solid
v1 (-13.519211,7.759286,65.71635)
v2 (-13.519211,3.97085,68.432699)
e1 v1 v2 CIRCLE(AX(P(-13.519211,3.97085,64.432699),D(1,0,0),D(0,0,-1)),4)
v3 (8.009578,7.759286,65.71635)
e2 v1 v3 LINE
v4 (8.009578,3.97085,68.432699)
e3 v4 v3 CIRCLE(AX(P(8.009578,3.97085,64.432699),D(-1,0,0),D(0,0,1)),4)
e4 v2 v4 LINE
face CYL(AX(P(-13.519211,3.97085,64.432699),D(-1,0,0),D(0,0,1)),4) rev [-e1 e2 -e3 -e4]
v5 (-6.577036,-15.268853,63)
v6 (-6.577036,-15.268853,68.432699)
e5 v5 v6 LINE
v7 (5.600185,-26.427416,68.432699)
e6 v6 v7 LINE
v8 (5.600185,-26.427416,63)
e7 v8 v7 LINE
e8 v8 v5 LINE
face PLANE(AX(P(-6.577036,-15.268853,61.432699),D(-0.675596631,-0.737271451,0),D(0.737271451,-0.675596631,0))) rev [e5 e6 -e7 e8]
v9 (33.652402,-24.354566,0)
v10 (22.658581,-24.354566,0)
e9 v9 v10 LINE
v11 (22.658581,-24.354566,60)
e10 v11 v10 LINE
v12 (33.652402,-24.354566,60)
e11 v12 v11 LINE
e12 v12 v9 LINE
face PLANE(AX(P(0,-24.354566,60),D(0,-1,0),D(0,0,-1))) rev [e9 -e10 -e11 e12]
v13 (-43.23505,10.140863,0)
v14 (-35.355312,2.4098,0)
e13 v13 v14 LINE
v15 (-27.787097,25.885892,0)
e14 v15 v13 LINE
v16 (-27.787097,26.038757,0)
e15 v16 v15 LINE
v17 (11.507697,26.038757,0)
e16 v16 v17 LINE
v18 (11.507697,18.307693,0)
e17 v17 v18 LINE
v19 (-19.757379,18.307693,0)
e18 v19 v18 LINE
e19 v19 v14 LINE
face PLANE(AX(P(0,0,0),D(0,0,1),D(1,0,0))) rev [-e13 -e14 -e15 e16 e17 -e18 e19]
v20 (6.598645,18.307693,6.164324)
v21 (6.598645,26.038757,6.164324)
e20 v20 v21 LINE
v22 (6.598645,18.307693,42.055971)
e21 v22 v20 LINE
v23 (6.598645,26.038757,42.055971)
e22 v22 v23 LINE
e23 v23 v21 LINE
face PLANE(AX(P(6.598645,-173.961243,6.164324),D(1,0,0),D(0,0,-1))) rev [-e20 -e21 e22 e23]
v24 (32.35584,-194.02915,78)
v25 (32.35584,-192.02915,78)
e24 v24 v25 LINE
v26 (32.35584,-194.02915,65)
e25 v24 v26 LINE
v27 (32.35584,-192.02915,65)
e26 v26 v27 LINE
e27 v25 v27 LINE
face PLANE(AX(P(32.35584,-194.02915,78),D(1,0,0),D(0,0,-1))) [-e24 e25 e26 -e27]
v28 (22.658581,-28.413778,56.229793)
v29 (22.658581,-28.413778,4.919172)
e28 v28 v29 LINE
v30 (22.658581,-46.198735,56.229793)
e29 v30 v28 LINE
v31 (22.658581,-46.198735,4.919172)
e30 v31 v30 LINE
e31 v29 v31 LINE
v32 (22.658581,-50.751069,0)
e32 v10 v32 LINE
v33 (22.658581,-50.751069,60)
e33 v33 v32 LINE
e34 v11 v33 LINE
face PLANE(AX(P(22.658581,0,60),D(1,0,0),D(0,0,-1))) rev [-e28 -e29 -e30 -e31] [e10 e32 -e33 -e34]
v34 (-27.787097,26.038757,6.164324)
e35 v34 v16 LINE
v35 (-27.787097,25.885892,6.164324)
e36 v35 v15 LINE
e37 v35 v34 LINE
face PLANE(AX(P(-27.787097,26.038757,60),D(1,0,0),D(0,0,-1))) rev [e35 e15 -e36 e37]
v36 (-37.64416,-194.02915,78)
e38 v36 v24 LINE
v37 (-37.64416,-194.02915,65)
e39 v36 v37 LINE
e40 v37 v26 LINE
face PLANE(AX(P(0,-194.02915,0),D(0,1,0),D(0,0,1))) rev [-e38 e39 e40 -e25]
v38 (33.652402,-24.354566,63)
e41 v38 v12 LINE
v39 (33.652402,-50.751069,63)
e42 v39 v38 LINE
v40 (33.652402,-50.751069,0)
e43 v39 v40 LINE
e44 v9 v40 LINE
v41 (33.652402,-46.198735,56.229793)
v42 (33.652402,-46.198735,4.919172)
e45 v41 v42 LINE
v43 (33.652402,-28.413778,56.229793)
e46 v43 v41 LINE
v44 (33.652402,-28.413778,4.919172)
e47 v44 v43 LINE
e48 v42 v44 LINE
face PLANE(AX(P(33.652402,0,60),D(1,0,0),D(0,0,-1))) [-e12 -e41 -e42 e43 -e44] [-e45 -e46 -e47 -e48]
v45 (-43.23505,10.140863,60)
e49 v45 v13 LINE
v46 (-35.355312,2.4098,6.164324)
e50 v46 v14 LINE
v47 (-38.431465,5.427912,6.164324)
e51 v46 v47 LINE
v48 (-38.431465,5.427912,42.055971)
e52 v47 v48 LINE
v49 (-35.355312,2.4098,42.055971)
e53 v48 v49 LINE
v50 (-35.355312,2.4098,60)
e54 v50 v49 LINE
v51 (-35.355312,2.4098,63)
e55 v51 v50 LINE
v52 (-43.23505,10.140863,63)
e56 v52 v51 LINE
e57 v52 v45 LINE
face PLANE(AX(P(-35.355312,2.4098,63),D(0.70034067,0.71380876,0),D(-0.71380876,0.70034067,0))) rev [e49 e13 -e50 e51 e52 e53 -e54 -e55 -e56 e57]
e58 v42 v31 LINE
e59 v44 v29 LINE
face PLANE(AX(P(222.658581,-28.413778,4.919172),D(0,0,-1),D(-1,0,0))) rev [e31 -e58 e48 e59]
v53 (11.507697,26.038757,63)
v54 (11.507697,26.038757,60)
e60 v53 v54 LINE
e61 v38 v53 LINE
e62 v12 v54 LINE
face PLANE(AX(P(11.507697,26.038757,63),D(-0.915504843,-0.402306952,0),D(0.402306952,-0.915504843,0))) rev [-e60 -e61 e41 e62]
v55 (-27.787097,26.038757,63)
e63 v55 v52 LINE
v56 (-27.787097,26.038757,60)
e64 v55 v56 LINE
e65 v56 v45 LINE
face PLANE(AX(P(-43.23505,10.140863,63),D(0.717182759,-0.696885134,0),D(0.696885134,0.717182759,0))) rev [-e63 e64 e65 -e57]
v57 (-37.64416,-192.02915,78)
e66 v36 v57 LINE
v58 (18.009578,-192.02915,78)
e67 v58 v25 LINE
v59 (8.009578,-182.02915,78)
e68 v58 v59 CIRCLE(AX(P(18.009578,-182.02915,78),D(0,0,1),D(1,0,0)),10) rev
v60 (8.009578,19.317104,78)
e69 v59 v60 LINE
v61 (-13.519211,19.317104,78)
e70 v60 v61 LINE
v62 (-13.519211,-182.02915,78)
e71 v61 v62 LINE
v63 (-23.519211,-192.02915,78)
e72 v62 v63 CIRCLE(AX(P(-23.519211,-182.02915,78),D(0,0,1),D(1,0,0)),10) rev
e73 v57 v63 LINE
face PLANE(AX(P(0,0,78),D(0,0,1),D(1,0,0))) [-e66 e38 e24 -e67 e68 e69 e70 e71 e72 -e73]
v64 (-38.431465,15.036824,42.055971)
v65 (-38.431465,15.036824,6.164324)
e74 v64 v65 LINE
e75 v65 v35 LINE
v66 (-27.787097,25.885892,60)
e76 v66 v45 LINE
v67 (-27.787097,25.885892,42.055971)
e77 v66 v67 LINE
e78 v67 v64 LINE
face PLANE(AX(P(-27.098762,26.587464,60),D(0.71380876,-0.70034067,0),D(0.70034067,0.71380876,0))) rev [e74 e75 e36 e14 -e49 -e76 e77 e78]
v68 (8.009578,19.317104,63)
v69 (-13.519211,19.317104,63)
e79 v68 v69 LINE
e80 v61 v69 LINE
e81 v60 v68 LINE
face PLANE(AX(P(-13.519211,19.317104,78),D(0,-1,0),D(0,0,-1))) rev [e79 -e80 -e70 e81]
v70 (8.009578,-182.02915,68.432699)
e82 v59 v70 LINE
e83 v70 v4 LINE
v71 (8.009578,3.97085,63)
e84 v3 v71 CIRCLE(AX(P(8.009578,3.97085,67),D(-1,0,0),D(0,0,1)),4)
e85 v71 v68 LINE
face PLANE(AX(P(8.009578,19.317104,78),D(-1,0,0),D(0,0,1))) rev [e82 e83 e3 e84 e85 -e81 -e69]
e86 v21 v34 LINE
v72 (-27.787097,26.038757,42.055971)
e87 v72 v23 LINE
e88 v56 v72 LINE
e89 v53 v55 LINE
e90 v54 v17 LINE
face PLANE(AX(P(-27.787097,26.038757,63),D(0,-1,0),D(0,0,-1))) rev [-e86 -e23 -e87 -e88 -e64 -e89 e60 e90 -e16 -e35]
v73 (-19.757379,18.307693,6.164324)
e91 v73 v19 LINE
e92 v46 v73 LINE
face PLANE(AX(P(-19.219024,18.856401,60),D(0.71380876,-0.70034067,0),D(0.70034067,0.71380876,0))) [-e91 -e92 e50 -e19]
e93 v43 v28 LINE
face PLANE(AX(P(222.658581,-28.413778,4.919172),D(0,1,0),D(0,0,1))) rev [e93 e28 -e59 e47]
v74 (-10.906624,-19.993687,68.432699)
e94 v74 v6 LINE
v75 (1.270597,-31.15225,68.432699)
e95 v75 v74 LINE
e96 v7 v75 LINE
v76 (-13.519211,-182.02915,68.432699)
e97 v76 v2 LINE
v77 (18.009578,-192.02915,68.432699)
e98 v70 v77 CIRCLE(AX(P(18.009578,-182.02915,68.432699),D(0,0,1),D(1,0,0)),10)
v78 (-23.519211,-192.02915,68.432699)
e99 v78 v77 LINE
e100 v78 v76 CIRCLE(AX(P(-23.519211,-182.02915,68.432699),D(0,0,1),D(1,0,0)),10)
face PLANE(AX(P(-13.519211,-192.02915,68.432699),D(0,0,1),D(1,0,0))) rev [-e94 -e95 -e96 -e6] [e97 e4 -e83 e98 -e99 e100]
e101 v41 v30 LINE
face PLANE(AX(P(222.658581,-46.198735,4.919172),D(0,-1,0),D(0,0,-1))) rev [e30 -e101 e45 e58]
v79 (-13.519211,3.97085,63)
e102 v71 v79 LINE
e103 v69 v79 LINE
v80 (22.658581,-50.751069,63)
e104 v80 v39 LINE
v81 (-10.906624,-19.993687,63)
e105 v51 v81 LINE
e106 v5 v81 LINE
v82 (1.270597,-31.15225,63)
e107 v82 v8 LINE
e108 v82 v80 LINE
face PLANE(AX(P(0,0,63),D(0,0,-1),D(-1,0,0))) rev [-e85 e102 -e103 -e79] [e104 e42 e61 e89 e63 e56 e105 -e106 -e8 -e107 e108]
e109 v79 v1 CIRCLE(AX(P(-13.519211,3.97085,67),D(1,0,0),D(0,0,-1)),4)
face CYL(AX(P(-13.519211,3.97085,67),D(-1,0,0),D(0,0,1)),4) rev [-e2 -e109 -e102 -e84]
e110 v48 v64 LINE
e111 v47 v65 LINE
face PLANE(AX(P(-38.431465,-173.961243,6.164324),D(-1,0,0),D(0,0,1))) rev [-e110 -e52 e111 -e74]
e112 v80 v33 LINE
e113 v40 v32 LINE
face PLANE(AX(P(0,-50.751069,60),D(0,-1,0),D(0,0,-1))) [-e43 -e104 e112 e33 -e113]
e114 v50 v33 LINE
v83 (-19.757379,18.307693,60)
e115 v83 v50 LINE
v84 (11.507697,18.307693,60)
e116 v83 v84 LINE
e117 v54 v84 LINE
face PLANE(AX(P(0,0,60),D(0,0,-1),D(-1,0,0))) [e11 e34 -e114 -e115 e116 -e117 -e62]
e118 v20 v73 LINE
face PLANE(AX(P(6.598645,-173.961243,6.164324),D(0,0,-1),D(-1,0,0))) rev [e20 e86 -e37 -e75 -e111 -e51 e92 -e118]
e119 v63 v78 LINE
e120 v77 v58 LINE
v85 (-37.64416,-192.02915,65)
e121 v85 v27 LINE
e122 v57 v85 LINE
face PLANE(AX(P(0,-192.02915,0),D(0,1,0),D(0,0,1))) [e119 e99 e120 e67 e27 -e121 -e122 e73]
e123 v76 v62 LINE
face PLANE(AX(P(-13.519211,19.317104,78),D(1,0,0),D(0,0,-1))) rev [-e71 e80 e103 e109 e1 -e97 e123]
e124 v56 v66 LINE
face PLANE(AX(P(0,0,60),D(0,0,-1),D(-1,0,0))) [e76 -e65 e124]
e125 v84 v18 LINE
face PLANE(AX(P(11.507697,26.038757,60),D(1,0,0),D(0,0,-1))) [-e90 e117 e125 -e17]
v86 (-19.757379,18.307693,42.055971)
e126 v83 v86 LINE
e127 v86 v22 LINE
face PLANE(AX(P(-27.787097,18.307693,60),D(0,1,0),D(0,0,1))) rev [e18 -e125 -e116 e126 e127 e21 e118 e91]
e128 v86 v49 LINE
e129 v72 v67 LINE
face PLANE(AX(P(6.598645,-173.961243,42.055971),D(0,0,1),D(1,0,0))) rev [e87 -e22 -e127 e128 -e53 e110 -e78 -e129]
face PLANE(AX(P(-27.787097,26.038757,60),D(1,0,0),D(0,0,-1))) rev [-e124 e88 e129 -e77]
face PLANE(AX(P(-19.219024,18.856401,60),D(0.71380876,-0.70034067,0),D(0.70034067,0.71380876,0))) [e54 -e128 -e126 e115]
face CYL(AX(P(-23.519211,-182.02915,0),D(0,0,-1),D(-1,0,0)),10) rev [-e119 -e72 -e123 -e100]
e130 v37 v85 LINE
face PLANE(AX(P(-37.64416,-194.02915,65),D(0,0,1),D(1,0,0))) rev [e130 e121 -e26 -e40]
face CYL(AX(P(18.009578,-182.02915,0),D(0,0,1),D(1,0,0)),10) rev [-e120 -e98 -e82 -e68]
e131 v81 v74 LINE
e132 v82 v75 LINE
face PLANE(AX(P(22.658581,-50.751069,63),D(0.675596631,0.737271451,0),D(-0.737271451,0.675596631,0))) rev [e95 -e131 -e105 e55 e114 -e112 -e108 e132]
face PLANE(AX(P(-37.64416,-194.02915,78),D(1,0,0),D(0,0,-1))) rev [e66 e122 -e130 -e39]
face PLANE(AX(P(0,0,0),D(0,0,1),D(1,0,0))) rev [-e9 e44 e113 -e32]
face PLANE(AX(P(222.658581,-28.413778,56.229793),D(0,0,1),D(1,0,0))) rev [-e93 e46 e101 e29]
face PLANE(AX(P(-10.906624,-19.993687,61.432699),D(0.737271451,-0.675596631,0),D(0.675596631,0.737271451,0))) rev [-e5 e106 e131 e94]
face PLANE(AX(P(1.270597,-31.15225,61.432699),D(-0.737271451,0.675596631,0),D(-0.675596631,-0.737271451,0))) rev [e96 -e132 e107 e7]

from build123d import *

# Parameters (mm, degrees)
BOSS_EXTRUDE1_DEPTH   = 60
SKETCH1_W             = 10.993820537
SKETCH1_H             = 26.396502677
BOSS_EXTRUDE1_2_DEPTH = 60
BOSS_EXTRUDE2_DEPTH   = 3
SKETCH3_W             = 21.528788888
SKETCH3_H             = 11.346253603
BOSS_EXTRUDE3_DEPTH   = 15
SKETCH4_W             = 21.528788888
SKETCH4_H             = 9.567300702
BOSS_EXTRUDE4_DEPTH   = 200
SKETCH5_W             = 51.310621716
SKETCH5_H             = 17.784956531
CUT_EXTRUDE1_DEPTH    = 200
SKETCH6_W             = 45.030110597
SKETCH6_H             = 35.891646976
CUT_EXTRUDE2_DEPTH    = 200
SKETCH7_W             = 70
SKETCH7_H             = 13
BOSS_EXTRUDE5_DEPTH   = 2
FILLET1_R             = 10
FILLET3_R             = 4
BOSS_EXTRUDE6_DEPTH   = 7


with BuildPart() as part:
    # Sketch1 → Boss-Extrude1 (new body)
    with BuildSketch(Plane.XY):
        Polygon((-19.757378597, 18.307693349), (11.507697245, 18.307693349), (11.507697245, 26.038756838), (-27.787096512, 26.038756838), (-27.787096512, 25.885892475), (-43.235049783, 10.14086318), (-35.355311996, 2.409799691), align=None)
    extrude(amount=BOSS_EXTRUDE1_DEPTH)



with BuildPart() as body_2:
    # Sketch1 → Boss-Extrude1 2 (new body)
    with BuildSketch(Plane.XY):
        with Locations((28.155491547, -37.552817793)):
            Rectangle(SKETCH1_W, SKETCH1_H)
    extrude(amount=BOSS_EXTRUDE1_2_DEPTH)


with BuildPart() as part_1:
    add(part.part)

    add(body_2.part)  # Boss-Extrude2 merges body 2
    # Sketch2 → Boss-Extrude2 (add)
    with BuildSketch(Plane.XY.offset(60)):
        Polygon((-43.235049783, 10.14086318), (-27.787096512, 26.038756838), (11.507697245, 26.038756838), (33.652401815, -24.354566454), (33.652401815, -50.751069131), (22.658581278, -50.751069131), (-35.355311996, 2.409799691), align=None)
    extrude(amount=BOSS_EXTRUDE2_DEPTH)

    # Sketch3 → Boss-Extrude3 (add)
    with BuildSketch(Plane.XY.offset(63)):
        with Locations((-2.754816927, 13.64397724)):
            Rectangle(SKETCH3_W, SKETCH3_H)
    extrude(amount=BOSS_EXTRUDE3_DEPTH)

    # Sketch4 → Boss-Extrude4 (add)
    with BuildSketch(Plane.XZ.offset(-7.970850439)):
        with Locations((-2.754816927, 73.216349649)):
            Rectangle(SKETCH4_W, SKETCH4_H)
    extrude(amount=BOSS_EXTRUDE4_DEPTH)

    # Sketch5 → Cut-Extrude1 (cut)
    with BuildSketch(Plane.ZY.offset(-22.658581278)):
        with Locations((30.574482512, -37.306256307)):
            Rectangle(SKETCH5_W, SKETCH5_H)
    extrude(amount=-CUT_EXTRUDE1_DEPTH, mode=Mode.SUBTRACT)

    # Sketch6 → Cut-Extrude2 (cut)
    with BuildSketch(Plane(origin=(0, 26.038756838, 0), x_dir=(1, 0, 0), z_dir=(0, 1, 0))):
        with Locations((-15.916410132, -24.110147888)):
            Rectangle(SKETCH6_W, SKETCH6_H)
    extrude(amount=-CUT_EXTRUDE2_DEPTH, mode=Mode.SUBTRACT)

    # Sketch7 → Boss-Extrude5 (add)
    with BuildSketch(Plane.XZ.offset(192.029149561)):
        with Locations((-2.644159555, 71.5)):
            Rectangle(SKETCH7_W, SKETCH7_H)
    extrude(amount=BOSS_EXTRUDE5_DEPTH)

    # Fillet1
    fillet1_edges = [part_1.edges().sort_by_distance(p)[0] for p in [
        (-13.519211371, -192.029149561, 73.216349649),
        (8.009577517, -192.029149561, 73.216349649),
    ]]
    fillet(fillet1_edges, radius=FILLET1_R)

    # Fillet3
    # the kernel refuses this fillet: 4 mm, written as the material it adds along each edge
    with BuildSketch(Plane(origin=(8.009577517, 7.970850439, 63), x_dir=(0, 0, 1), z_dir=(-1, 0, 0)), Plane(origin=(8.009577517, 7.970850439, 68.432699298), x_dir=(0, -1, 0), z_dir=(-1, 0, 0))) as fillet3_piece_1:
        with BuildLine():
            CenterArc((FILLET3_R, -FILLET3_R), FILLET3_R, 90, 90)
            Line((0, -FILLET3_R), (0, 0))
            Line((0, 0), (FILLET3_R, 0))
        make_face()
    extrude(amount=21.528788888)

    # Sketch8 → Boss-Extrude6 (add)
    with BuildSketch(Plane(origin=(0, 0, 68.432699298), x_dir=(-1, 0, 0), z_dir=(0, 0, -1))):
        Polygon((10.906624275, -19.993686913), (-1.270597079, -31.152249638), (-5.600185218, -26.427415943), (6.577036136, -15.268853218), align=None)
    extrude(amount=BOSS_EXTRUDE6_DEPTH)


solid = part_1.part
